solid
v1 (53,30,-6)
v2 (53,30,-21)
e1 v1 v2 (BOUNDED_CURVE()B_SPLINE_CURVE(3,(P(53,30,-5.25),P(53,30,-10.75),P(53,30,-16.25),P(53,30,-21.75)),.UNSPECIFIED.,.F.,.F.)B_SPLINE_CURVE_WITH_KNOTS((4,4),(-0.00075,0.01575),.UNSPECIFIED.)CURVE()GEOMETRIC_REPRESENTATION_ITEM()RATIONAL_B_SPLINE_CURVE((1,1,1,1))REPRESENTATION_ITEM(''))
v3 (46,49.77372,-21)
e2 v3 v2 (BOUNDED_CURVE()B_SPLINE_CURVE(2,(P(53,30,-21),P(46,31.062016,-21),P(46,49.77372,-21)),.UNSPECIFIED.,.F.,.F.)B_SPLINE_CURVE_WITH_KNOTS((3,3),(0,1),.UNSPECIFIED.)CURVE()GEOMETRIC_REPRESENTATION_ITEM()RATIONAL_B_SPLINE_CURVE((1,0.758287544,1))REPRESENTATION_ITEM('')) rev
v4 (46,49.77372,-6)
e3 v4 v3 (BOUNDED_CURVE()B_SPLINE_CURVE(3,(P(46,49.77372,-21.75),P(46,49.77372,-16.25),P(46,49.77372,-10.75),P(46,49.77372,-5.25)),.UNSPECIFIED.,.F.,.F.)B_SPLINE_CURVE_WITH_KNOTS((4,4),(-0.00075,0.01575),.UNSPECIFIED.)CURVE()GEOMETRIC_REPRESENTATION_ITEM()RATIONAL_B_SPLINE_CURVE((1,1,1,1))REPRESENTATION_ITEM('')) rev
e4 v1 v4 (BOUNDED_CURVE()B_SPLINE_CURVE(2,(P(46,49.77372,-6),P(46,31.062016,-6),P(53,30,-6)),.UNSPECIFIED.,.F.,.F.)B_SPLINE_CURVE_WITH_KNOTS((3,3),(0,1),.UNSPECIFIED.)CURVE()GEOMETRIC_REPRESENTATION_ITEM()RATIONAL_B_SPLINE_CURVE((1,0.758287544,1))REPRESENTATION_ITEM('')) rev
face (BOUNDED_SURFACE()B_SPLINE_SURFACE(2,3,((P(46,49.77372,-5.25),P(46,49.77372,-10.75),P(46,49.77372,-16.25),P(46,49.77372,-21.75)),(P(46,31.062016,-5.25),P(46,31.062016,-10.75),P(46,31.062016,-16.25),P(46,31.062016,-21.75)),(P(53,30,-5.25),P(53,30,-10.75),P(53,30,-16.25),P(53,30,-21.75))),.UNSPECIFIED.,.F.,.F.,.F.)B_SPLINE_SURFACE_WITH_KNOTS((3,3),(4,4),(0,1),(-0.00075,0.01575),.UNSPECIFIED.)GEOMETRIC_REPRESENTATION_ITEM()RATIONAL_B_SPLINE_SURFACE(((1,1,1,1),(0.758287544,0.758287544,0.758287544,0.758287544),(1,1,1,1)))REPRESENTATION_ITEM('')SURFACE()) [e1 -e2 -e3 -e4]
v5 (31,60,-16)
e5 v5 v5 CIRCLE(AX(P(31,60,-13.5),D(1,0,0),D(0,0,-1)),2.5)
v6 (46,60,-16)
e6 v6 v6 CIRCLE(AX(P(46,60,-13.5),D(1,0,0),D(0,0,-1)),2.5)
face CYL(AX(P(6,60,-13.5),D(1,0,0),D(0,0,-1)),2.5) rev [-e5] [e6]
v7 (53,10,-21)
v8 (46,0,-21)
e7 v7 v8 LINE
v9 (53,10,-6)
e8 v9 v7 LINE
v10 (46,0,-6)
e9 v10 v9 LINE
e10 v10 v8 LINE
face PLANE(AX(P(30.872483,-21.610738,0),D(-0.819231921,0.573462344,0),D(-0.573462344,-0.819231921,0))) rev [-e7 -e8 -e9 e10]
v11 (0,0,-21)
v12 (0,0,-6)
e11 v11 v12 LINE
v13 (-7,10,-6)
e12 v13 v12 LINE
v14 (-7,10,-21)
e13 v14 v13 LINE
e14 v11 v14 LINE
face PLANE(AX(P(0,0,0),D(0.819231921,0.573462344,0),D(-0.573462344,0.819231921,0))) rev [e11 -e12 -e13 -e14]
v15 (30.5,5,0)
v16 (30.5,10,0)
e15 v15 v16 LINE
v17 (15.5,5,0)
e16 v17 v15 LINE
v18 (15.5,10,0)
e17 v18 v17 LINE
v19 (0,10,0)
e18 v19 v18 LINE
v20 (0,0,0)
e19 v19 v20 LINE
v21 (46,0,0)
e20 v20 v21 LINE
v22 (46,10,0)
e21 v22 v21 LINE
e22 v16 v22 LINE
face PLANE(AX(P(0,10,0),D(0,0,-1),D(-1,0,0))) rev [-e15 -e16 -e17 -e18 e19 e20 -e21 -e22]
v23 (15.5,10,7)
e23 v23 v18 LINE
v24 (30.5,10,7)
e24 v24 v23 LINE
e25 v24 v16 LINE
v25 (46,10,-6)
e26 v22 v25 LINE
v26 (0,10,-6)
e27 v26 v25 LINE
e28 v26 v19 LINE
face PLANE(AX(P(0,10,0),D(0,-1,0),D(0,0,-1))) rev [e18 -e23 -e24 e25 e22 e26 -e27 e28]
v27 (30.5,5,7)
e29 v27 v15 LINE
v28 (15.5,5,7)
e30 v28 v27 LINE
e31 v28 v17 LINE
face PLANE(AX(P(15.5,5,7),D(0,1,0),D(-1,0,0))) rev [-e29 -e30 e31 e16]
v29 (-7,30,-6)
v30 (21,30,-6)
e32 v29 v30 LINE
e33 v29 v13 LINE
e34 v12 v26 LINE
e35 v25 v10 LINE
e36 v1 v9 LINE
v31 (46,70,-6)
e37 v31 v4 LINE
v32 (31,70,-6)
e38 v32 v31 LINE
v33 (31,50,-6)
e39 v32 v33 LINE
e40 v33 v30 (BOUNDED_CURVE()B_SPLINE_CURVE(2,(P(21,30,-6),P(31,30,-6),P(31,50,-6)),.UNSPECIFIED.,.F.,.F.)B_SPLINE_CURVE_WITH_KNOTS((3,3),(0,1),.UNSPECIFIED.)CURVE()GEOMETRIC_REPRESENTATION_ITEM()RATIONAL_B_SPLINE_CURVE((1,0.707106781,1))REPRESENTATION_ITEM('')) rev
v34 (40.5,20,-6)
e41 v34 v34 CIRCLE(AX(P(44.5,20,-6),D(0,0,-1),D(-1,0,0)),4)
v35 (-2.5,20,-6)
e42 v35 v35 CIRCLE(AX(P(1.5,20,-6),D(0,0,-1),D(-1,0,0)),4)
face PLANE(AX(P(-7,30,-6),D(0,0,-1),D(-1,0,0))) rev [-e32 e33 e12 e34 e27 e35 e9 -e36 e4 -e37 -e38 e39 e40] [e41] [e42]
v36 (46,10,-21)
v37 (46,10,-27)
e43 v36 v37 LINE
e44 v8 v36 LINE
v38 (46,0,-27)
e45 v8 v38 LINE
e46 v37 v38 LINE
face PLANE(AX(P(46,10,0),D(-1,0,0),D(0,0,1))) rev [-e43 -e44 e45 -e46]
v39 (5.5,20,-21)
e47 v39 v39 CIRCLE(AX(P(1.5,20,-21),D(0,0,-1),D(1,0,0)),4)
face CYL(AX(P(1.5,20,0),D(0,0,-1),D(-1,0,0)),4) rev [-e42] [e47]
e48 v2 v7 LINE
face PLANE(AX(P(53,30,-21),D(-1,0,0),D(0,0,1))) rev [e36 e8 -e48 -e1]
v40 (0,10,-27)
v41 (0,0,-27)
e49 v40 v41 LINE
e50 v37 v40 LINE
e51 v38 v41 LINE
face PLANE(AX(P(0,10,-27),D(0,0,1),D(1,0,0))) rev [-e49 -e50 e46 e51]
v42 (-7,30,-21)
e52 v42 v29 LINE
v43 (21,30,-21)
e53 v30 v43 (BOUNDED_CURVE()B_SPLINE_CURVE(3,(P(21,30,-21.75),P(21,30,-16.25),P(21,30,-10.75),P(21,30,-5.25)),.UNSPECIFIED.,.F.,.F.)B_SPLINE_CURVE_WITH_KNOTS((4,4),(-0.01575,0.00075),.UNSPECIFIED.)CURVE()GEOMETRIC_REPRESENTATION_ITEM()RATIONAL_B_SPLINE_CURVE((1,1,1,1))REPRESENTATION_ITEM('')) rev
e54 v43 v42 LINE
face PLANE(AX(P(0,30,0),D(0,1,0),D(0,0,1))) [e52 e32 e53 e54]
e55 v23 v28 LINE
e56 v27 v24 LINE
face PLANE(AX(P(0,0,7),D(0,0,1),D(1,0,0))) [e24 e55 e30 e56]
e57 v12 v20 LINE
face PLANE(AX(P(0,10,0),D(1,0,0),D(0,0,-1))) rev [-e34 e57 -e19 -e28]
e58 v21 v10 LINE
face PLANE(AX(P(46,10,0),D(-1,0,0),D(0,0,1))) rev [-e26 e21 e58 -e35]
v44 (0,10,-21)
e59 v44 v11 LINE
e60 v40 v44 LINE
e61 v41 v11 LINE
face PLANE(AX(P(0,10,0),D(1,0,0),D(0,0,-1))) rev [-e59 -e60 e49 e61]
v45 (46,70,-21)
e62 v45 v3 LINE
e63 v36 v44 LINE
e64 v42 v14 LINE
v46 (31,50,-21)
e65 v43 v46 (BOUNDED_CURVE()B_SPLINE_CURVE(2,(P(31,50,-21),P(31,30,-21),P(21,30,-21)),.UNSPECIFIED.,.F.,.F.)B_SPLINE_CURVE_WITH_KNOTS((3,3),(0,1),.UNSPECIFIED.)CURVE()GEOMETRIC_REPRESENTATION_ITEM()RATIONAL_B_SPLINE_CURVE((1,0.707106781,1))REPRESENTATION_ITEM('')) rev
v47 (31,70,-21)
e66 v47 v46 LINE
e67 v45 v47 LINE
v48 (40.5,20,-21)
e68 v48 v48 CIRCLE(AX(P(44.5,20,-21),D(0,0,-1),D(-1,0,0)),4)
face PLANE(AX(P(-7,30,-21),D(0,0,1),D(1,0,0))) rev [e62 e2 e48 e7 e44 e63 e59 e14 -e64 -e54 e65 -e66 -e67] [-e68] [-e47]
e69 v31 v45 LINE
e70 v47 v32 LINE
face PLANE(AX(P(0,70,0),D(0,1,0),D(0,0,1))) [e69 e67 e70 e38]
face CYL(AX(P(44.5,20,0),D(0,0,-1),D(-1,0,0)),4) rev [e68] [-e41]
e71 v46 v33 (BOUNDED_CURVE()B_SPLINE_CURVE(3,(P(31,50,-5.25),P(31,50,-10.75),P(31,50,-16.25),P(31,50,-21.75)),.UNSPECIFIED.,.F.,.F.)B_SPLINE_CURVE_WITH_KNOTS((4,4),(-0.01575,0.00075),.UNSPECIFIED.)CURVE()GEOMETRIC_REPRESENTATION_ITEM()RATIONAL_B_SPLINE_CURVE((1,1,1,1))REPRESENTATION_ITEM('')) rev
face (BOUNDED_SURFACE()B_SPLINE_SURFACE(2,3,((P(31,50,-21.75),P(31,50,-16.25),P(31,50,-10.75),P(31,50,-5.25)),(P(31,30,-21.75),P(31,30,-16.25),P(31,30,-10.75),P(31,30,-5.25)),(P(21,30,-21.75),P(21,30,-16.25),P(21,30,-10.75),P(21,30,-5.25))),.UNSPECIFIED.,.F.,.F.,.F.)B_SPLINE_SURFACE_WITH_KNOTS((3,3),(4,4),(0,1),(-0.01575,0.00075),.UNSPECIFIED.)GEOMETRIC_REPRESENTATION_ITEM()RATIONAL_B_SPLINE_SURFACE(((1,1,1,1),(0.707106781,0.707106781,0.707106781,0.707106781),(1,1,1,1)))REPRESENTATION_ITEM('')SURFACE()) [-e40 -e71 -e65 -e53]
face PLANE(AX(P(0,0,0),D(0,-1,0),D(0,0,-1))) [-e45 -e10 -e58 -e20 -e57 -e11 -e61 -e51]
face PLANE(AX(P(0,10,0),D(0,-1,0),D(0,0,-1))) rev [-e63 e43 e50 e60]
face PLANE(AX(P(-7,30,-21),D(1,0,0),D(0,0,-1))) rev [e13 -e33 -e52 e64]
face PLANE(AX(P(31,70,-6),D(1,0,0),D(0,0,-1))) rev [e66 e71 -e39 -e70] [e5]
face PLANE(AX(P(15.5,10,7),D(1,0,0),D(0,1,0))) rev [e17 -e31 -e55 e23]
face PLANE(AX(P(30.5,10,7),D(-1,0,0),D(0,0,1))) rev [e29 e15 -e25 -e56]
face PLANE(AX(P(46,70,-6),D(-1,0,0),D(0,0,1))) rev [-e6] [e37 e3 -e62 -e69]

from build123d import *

# Parameters (mm, degrees)
SKETCH1_W           = 46
SKETCH1_H           = 27
BOSS_EXTRUDE1_DEPTH = 10
SKETCH2_W           = 60
SKETCH2_H           = 15
BOSS_EXTRUDE2_DEPTH = 20
SKETCH3_R           = 4
CUT_EXTRUDE2_DEPTH  = 65.420493634
SKETCH6_W           = 15
SKETCH6_H           = 5
BOSS_EXTRUDE4_DEPTH = 7
BOSS_EXTRUDE5_START = -21
BOSS_EXTRUDE5_DEPTH = 15
BOSS_EXTRUDE6_START = -21
BOSS_EXTRUDE6_DEPTH = 15
SKETCH12_W          = 15
SKETCH12_H          = 15
BOSS_EXTRUDE8_DEPTH = 40
SKETCH13_R          = 2.5
CUT_EXTRUDE4_DEPTH  = 40
FILLET1_START       = -21
FILLET1_DEPTH       = 15


with BuildPart() as part:
    # Sketch1 → Boss-Extrude1 (new body)
    with BuildSketch(Plane(origin=(0, 0, 0), x_dir=(1, 0, 0), z_dir=(0, 1, 0))):
        with Locations((23, 13.5)):
            Rectangle(SKETCH1_W, SKETCH1_H)
    extrude(amount=BOSS_EXTRUDE1_DEPTH)

    # Sketch2 → Boss-Extrude2 (add)
    with BuildSketch(Plane(origin=(0, 10, 0), x_dir=(1, 0, 0), z_dir=(0, 1, 0))):
        with Locations((23, 13.5)):
            Rectangle(SKETCH2_W, SKETCH2_H)
    extrude(amount=BOSS_EXTRUDE2_DEPTH)

    # Sketch3 → Cut-Extrude2 (cut, through all)
    with BuildSketch(Plane(origin=(0, 0, -21), x_dir=(-1, 0, 0), z_dir=(0, 0, -1))):
        with Locations((-44.5, 20)):
            Circle(SKETCH3_R)
        with Locations((-1.5, 20)):
            Circle(SKETCH3_R)
    extrude(amount=-CUT_EXTRUDE2_DEPTH, mode=Mode.SUBTRACT)

    # Sketch6 → Boss-Extrude4 (add)
    with BuildSketch(Plane.XY):
        with Locations((23, 7.5)):
            Rectangle(SKETCH6_W, SKETCH6_H)
    extrude(amount=BOSS_EXTRUDE4_DEPTH)

    # Boss-Extrude5: read off the stored shape, not the designer's step
    # Boss-Extrude5 outline → Boss-Extrude5 (add)
    with BuildSketch(Plane.XY.offset(BOSS_EXTRUDE5_START)):
        Polygon((-7, 10), (0, 0), (0, 10), align=None)
    extrude(amount=BOSS_EXTRUDE5_DEPTH)

    # Boss-Extrude6: read off the stored shape, not the designer's step
    # Boss-Extrude6 outline → Boss-Extrude6 (add)
    with BuildSketch(Plane.XY.offset(BOSS_EXTRUDE6_START)):
        Polygon((46, 0), (53, 10), (46, 10), align=None)
    extrude(amount=BOSS_EXTRUDE6_DEPTH)

    # Sketch12 → Boss-Extrude8 (add)
    with BuildSketch(Plane(origin=(0, 30, 0), x_dir=(1, 0, 0), z_dir=(0, 1, 0))):
        with Locations((38.5, 13.5)):
            Rectangle(SKETCH12_W, SKETCH12_H)
    extrude(amount=BOSS_EXTRUDE8_DEPTH)

    # Sketch13 → Cut-Extrude4 (cut)
    with BuildSketch(Plane(origin=(46, 0, 0), x_dir=(0, 0, -1), z_dir=(1, 0, 0))):
        with Locations((13.5, 60)):
            Circle(SKETCH13_R)
    extrude(amount=-CUT_EXTRUDE4_DEPTH, mode=Mode.SUBTRACT)

    # Fillet1: read off the stored shape, not the designer's step
    # Fillet1 outline → Fillet1 (add)
    with BuildSketch(Plane.XY.offset(FILLET1_START)):
        with BuildLine():
            Line((31, 30), (31, 50))
            add(Edge.make_bspline(
                [(31, 50), (31, 30), (21, 30)],
                knots=[0, 0, 0, 1, 1, 1], degree=2, weights=[1, 0.707106781, 1]))
            Line((21, 30), (31, 30))
        make_face()
        with BuildLine():
            add(Edge.make_bspline(
                [(46, 49.773719933), (46, 31.062015649), (53, 30)],
                knots=[0, 0, 0, 1, 1, 1], degree=2, weights=[1, 0.758287544, 1]))
            Line((46, 49.773719933), (46, 30))
            Line((46, 30), (53, 30))
        make_face()
    extrude(amount=FILLET1_DEPTH)


solid = part.part
